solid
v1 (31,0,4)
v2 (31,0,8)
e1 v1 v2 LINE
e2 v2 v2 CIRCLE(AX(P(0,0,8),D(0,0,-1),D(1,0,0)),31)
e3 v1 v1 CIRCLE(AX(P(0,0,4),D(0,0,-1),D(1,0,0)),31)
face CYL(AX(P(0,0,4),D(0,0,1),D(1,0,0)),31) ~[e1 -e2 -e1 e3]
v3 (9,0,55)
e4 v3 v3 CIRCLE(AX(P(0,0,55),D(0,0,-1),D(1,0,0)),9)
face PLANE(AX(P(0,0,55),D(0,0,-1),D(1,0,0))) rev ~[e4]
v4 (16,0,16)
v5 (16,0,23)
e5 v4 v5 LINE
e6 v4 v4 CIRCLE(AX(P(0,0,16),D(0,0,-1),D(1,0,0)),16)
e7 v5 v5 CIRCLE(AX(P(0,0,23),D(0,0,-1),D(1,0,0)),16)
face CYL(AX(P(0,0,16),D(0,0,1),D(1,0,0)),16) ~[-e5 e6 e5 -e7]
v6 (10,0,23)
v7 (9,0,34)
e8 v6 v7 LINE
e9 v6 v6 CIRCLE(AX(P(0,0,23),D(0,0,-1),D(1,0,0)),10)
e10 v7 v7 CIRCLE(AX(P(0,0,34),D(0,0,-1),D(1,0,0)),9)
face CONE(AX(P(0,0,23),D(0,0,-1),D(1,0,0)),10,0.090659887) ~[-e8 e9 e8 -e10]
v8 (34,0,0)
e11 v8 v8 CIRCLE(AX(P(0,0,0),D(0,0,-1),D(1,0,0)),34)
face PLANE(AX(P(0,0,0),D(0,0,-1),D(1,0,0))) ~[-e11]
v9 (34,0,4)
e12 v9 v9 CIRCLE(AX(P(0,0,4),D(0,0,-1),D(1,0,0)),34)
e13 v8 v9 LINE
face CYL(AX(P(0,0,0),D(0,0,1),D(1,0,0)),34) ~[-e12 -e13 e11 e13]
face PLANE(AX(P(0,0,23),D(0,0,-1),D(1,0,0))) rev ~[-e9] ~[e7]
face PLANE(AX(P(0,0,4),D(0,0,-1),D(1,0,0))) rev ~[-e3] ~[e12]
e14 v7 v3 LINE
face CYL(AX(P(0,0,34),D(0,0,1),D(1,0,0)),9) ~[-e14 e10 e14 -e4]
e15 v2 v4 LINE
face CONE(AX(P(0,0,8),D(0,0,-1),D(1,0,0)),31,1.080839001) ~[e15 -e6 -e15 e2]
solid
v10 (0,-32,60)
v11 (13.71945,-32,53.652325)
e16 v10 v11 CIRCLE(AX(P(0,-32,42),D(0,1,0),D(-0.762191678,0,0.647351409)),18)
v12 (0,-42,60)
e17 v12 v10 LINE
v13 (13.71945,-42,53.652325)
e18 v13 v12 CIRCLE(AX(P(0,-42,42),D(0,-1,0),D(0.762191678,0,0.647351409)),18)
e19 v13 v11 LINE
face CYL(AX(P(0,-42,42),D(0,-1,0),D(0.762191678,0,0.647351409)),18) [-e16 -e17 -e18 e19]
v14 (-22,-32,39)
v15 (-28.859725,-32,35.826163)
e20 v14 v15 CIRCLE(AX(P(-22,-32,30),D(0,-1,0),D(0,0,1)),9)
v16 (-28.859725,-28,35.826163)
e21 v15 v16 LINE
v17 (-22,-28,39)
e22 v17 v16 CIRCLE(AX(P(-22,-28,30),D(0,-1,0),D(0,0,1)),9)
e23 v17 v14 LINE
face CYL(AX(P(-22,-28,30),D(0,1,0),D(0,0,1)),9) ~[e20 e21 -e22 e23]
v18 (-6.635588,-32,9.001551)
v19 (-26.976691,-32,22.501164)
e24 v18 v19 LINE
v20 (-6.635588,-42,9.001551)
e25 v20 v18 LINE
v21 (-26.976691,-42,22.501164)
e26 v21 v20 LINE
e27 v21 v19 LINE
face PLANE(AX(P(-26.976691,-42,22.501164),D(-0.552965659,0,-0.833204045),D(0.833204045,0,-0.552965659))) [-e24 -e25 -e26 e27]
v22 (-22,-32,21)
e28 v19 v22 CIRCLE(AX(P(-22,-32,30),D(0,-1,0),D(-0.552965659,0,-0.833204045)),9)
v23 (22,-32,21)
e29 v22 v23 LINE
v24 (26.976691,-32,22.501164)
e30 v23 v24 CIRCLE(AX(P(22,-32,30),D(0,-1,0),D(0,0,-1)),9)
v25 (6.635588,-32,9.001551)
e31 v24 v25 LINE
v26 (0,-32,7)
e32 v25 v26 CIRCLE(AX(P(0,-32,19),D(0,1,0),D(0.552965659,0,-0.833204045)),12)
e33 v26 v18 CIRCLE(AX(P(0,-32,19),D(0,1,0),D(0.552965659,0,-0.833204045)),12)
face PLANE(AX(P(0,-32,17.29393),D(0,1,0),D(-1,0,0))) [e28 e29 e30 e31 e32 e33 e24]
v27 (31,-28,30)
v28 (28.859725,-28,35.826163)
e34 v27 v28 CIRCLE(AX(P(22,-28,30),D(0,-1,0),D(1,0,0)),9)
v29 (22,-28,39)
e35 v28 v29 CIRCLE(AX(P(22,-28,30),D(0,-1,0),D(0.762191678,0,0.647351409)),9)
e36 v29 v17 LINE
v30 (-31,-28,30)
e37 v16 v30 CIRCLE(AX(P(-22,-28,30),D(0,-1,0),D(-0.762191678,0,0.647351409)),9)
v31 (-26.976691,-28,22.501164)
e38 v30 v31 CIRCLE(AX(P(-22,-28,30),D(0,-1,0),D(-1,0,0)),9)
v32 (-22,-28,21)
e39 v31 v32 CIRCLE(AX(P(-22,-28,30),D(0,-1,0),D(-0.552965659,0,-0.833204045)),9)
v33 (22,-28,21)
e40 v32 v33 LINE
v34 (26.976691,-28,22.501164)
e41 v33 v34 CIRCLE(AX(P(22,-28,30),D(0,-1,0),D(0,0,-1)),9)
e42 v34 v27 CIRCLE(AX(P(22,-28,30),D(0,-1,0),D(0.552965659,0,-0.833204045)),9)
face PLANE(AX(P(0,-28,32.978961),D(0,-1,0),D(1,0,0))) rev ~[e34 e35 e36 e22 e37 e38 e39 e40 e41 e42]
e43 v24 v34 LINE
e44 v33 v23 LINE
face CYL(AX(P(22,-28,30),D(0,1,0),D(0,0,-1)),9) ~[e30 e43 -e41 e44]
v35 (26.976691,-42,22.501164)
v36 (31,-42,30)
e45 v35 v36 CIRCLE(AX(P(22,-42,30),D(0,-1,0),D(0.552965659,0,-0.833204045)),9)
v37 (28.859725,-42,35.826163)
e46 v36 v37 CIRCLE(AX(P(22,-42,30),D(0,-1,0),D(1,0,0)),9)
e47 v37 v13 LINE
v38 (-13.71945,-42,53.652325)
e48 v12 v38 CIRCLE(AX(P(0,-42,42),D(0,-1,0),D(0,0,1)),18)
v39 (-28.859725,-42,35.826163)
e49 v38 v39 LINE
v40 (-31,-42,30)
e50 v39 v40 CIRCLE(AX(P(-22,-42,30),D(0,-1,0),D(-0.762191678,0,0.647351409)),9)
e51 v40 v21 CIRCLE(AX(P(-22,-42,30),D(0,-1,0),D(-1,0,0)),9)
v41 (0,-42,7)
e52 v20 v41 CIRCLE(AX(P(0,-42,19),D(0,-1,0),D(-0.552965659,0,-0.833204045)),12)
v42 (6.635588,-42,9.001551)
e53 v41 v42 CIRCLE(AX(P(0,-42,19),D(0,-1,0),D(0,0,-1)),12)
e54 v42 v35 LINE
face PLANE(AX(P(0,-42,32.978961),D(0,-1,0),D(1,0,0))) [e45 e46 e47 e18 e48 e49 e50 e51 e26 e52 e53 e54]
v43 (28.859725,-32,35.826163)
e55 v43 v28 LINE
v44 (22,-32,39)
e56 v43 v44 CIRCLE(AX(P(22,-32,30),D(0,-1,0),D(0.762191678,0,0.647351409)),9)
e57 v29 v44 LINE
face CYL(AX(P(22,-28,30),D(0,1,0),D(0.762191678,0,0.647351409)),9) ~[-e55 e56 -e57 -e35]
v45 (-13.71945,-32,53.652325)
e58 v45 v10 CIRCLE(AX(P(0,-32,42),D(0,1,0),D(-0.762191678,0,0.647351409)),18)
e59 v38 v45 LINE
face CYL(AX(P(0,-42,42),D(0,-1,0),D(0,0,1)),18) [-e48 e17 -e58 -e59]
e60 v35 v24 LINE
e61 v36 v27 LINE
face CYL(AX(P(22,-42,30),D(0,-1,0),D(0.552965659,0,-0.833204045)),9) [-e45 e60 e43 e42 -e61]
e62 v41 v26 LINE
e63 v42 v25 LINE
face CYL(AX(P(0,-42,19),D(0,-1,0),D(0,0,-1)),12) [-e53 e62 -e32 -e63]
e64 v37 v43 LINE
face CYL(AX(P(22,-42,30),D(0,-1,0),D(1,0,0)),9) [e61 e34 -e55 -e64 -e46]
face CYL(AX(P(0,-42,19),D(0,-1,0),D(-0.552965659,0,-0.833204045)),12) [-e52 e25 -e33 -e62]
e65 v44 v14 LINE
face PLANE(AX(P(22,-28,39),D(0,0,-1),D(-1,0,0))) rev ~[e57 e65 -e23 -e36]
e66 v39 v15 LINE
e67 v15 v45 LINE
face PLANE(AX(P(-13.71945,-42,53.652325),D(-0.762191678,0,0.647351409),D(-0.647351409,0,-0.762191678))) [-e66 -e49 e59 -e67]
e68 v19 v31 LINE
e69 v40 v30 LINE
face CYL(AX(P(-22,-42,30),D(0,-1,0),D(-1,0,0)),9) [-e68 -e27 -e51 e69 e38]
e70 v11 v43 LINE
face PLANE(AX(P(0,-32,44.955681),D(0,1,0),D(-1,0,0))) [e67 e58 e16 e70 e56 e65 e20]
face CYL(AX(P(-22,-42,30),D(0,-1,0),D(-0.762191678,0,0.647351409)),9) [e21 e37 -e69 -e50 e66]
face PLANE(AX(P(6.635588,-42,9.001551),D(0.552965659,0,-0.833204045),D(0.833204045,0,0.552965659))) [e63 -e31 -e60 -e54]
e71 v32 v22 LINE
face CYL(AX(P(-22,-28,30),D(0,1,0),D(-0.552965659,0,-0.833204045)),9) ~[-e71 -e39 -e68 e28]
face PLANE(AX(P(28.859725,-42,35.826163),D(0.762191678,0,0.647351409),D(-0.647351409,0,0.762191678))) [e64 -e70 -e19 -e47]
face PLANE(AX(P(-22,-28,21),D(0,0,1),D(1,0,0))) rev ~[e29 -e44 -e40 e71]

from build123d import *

# Parameters (mm, degrees)
F4_DEPTH = 14
F6_DEPTH = 4


with BuildPart() as f1:
    # F0 (on Front) → F1 (revolve)
    with BuildSketch(Plane.XZ):
        Polygon((0, 0), (34, 0), (34, 4), (31, 4), (31, 8), (16, 16), (16, 23), (10, 23), (9, 34), (9, 55), (0, 55), align=None)
    revolve(axis=Axis((0, 0, 27.5), (0, 0, -1)))


with BuildPart() as f4:
    # F3 (on offset) → F4 (new body)
    with BuildSketch(Plane.XZ.offset(42)):
        with BuildLine():
            ThreePointArc((26.9766909288, 22.501163597), (29.93064368, 25.7450157673), (31, 30))
            ThreePointArc((31, 30), (30.4480034885, 33.1034234416), (28.8597250983, 35.8261626802))
            Line((28.8597250983, 35.8261626802), (13.7194501966, 53.6523253604))
            ThreePointArc((13.7194501966, 53.6523253604), (7.5583775876, 58.3361846293), (0, 60))
            ThreePointArc((0, 60), (-7.5583775876, 58.3361846293), (-13.7194501966, 53.6523253604))
            Line((-13.7194501966, 53.6523253604), (-28.8597250983, 35.8261626802))
            ThreePointArc((-28.8597250983, 35.8261626802), (-30.4480034885, 33.1034234416), (-31, 30))
            ThreePointArc((-31, 30), (-29.93064368, 25.7450157673), (-26.9766909288, 22.501163597))
            Line((-26.9766909288, 22.501163597), (-6.635587905, 9.0015514626))
            ThreePointArc((-6.635587905, 9.0015514626), (-3.4654449607, 7.5112798265), (0, 7))
            ThreePointArc((0, 7), (3.4654449607, 7.5112798265), (6.635587905, 9.0015514626))
            Line((6.635587905, 9.0015514626), (26.9766909288, 22.501163597))
        make_face()
    extrude(amount=-F4_DEPTH)

    # F5 (on face) → F6 (cut)
    with BuildSketch(Plane(origin=(0, -28, 0), x_dir=(-1, 0, 0), z_dir=(0, 1, 0))):
        with BuildLine():
            ThreePointArc((-22, 21), (-24.5990837205, 21.3834598699), (-26.9766909288, 22.501163597))
            Line((-26.9766909288, 22.501163597), (-6.635587905, 9.0015514626))
            ThreePointArc((-6.635587905, 9.0015514626), (0, 7), (6.635587905, 9.0015514626))
            Line((6.635587905, 9.0015514626), (26.9766909288, 22.501163597))
            ThreePointArc((26.9766909288, 22.501163597), (24.5990837205, 21.3834598699), (22, 21))
            Line((22, 21), (-22, 21))
        make_face()
        with BuildLine():
            ThreePointArc((-28.8597250983, 35.8261626802), (-25.7791887938, 38.1680923147), (-22, 39))
            Line((-22, 39), (22, 39))
            ThreePointArc((22, 39), (25.7791887938, 38.1680923147), (28.8597250983, 35.8261626802))
            Line((28.8597250983, 35.8261626802), (13.7194501966, 53.6523253604))
            ThreePointArc((13.7194501966, 53.6523253604), (0, 60), (-13.7194501966, 53.6523253604))
            Line((-13.7194501966, 53.6523253604), (-28.8597250983, 35.8261626802))
        make_face()
    extrude(amount=-F6_DEPTH, mode=Mode.SUBTRACT)


solid = Compound([f1.part, f4.part])
